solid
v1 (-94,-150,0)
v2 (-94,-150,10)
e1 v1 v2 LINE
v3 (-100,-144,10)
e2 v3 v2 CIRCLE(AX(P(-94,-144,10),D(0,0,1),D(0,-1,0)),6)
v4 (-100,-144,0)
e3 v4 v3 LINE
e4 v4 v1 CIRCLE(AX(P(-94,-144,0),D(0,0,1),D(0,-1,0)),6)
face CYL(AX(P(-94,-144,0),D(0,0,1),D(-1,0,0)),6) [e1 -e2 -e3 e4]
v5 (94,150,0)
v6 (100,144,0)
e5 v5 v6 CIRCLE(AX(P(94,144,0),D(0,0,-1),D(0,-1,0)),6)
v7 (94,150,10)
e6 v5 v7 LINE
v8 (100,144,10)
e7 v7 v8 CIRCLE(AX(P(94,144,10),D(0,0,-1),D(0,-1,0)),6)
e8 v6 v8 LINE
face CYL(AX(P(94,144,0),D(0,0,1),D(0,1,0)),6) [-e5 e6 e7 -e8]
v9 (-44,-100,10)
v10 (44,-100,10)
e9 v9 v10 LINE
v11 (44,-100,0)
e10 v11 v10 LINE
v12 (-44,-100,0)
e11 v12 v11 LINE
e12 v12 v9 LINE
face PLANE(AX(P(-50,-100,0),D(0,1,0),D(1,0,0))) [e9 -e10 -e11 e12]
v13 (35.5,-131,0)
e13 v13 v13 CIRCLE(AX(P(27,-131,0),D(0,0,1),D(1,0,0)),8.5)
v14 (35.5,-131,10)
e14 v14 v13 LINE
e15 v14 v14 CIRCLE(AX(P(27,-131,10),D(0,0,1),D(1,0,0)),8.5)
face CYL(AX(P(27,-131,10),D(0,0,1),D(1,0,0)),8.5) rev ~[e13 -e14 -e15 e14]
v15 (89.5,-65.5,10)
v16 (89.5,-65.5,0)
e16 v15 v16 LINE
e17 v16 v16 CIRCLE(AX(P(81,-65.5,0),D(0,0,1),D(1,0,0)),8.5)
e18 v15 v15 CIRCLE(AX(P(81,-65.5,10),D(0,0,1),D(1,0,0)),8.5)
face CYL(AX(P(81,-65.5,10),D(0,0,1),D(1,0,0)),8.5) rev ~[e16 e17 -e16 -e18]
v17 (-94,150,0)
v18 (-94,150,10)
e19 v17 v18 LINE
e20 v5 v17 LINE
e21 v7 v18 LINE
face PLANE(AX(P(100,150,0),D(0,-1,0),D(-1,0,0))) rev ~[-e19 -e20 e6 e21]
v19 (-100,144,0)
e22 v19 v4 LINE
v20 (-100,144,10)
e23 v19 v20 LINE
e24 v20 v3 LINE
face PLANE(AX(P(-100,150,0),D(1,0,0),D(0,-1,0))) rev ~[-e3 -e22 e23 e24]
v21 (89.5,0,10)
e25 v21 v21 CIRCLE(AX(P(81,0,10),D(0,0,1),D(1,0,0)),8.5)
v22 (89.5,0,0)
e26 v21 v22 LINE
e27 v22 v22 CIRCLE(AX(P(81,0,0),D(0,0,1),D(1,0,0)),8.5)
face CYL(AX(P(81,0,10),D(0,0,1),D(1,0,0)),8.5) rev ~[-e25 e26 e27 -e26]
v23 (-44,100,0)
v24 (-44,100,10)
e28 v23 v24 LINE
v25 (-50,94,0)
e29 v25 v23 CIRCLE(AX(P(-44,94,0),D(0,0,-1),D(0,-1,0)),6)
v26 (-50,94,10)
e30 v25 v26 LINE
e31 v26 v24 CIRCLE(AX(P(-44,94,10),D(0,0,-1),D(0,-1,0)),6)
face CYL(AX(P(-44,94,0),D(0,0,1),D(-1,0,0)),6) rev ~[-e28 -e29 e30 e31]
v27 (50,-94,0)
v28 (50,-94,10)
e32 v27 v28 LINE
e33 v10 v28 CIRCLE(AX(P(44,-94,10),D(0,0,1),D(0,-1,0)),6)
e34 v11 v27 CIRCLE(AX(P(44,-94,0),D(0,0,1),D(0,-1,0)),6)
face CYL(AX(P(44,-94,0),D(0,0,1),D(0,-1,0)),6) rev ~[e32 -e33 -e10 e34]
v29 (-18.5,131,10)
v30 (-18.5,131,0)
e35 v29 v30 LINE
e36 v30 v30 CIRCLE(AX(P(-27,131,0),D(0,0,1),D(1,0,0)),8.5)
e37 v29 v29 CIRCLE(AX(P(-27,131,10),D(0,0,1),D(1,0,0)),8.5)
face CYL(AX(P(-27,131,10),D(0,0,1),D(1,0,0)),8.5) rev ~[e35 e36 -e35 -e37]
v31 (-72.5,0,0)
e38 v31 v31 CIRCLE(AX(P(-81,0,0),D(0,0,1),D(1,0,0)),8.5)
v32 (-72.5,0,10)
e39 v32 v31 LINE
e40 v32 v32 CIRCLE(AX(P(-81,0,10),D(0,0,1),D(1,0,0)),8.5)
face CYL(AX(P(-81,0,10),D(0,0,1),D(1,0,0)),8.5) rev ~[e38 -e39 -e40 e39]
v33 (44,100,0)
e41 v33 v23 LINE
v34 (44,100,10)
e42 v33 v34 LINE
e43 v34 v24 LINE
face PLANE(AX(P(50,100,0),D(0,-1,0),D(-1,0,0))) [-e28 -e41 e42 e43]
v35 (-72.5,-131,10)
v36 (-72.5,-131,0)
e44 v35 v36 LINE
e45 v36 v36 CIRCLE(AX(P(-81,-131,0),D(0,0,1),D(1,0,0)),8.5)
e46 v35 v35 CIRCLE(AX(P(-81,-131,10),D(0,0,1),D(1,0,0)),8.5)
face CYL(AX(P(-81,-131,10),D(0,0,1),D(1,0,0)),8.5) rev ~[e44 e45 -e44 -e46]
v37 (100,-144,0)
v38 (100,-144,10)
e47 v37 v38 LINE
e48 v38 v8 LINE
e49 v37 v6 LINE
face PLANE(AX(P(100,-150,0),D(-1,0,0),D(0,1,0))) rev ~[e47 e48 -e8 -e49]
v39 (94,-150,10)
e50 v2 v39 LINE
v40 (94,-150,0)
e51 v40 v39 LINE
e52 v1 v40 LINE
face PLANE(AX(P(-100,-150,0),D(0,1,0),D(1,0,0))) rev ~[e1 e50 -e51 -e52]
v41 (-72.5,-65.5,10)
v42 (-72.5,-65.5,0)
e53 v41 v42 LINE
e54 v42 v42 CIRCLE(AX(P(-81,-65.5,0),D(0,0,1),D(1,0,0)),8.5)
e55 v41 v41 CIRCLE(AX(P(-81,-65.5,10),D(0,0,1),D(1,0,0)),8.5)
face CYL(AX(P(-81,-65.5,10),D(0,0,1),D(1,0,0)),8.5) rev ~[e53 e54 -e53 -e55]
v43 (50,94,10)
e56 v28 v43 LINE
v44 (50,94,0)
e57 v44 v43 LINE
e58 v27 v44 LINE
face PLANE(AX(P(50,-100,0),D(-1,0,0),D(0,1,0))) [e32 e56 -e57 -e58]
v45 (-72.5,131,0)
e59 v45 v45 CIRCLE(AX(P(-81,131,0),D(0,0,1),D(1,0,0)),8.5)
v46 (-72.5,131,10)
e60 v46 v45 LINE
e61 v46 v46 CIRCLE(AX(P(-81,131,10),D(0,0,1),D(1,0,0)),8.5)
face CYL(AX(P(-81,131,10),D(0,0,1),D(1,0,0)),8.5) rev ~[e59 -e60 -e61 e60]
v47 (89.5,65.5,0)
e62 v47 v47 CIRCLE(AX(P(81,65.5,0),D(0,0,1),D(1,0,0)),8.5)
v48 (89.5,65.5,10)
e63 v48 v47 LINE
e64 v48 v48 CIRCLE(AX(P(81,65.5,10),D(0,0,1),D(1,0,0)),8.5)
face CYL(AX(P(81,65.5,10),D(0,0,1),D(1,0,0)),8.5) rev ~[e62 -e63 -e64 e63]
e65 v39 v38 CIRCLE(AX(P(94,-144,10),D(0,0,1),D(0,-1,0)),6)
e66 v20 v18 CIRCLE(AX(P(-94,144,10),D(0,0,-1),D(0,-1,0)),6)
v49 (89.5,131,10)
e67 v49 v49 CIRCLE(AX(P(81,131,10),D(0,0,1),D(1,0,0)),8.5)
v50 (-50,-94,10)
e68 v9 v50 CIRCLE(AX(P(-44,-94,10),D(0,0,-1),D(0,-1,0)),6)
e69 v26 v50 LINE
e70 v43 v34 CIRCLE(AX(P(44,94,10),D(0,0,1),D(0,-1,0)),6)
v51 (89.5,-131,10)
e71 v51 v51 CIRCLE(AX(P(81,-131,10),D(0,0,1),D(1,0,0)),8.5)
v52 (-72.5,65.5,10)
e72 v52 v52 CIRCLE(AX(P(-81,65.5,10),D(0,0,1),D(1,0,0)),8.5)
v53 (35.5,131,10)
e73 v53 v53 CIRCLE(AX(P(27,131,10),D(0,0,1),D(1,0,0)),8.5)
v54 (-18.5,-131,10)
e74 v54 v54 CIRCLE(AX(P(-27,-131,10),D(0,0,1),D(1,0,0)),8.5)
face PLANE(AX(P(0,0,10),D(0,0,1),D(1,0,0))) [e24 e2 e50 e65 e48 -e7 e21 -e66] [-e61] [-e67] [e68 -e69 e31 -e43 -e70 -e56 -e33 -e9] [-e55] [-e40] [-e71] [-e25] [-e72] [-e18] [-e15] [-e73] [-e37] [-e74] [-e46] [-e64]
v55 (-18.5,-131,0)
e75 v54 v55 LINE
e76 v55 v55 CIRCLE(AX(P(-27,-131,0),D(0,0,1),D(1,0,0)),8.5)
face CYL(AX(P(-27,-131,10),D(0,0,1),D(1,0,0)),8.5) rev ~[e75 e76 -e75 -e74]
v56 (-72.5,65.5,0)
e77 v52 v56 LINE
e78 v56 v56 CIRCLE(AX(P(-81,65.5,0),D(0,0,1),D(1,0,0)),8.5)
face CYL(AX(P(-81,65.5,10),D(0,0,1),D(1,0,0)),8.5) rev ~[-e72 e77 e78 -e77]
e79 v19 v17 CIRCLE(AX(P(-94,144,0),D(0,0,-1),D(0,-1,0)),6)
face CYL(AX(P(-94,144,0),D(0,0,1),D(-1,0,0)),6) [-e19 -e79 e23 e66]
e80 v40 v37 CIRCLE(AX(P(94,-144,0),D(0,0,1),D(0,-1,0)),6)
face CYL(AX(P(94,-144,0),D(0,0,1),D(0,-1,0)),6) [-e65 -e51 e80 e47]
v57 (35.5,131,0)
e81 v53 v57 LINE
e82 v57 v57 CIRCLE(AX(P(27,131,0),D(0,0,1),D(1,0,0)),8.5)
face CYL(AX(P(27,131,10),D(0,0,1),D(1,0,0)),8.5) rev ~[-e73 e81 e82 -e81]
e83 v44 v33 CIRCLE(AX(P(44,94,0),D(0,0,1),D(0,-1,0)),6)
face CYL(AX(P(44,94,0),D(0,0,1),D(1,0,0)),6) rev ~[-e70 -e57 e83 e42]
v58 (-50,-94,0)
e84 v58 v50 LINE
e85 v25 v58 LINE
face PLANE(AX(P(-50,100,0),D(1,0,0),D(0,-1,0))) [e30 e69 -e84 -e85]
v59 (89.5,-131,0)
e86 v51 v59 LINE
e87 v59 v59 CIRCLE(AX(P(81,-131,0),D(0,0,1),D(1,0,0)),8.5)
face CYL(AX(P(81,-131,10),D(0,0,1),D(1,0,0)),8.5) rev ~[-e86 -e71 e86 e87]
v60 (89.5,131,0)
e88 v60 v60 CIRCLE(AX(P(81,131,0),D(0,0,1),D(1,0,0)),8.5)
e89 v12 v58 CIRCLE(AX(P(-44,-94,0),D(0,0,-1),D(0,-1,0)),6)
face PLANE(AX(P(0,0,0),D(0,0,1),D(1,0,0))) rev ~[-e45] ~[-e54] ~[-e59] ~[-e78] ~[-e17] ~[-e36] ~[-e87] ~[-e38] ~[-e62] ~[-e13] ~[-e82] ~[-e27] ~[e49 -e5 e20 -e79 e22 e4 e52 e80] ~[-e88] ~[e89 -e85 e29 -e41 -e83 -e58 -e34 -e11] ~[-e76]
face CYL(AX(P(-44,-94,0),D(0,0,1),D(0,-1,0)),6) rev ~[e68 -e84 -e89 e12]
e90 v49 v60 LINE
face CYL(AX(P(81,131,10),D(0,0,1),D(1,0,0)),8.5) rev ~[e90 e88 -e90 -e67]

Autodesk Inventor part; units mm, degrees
ref_plane "YZ Plane" through (0, 0, 0) normal (1, 0, 0) x (0, 1, 0)
ref_plane "XZ Plane" through (0, 0, 0) normal (0, 1, 0) x (-1, 0, 0)
ref_plane "XY Plane" through (0, 0, 0) normal (0, 0, 1) x (1, 0, 0)
sketch "Sketch2" plane through (0, 0, 0) normal (0, 0, 1) x (1, 0, 0)
  line L0 (-50, -100) -> (50, -100)
  line L1 (50, -100) -> (50, 100)
  line L2 (50, 100) -> (-50, 100)
  line L3 (-50, 100) -> (-50, -100)
  line L4 (-50, -100) -> (50, 100) construction
  line L5 (50, -100) -> (-50, 100) construction
  line L6 (-100, -150) -> (100, -150)
  line L7 (100, -150) -> (100, 150)
  line L8 (100, 150) -> (-100, 150)
  line L9 (-100, 150) -> (-100, -150)
  point P0 (0, 0)
  dimension "d29" = 100
  dimension "d30" = 200
  dimension "d31" = 50
extrude "Plate2" add sketch "Sketch2" along normal blind 10
sketch "Sketch5" plane through (0, 0, 10) normal (0, 0, 1) x (1, 0, 0)
  line L0 (50, 100) -> (50, -100) construction
  line L1 (50, -100) -> (-50, -100) construction
  line L2 (-50, -100) -> (-50, 100) construction
  line L3 (-50, 100) -> (50, 100) construction
  line L4 (100, -150) -> (-100, -150) construction
  line L5 (100, 150) -> (100, -150) construction
  line L6 (-100, 150) -> (100, 150) construction
  line L7 (-100, -150) -> (-100, 150) construction
  line L8 (-81, 131) -> (81, 131) construction
  line L9 (81, 131) -> (81, -131) construction
  line L10 (81, -131) -> (-81, -131) construction
  line L11 (-81, -131) -> (-81, 131) construction
  circle A0 centre (-81, -131) radius 8.5
  circle A1 centre (-81, 131) radius 8.5
  circle A2 centre (-81, 0) radius 8.5
  circle A3 centre (-81, -65.5) radius 8.5
  circle A4 centre (-81, 65.5) radius 8.5
  line L12 (-50, 0) -> (50, 0) construction
  circle A5 centre (-27, -131) radius 8.5
  circle A6 centre (-27, -65.5) radius 8.5
  circle A7 centre (-27, 0) radius 8.5
  circle A8 centre (-27, 65.5) radius 8.5
  circle A9 centre (-27, 131) radius 8.5
  circle A10 centre (27, -131) radius 8.5
  circle A11 centre (27, -65.5) radius 8.5
  circle A12 centre (27, 0) radius 8.5
  circle A13 centre (27, 65.5) radius 8.5
  circle A14 centre (27, 131) radius 8.5
  circle A15 centre (81, -131) radius 8.5
  circle A16 centre (81, -65.5) radius 8.5
  circle A17 centre (81, 0) radius 8.5
  circle A18 centre (81, 65.5) radius 8.5
  circle A19 centre (81, 131) radius 8.5
  point P0 (0, 0)
  point P1 (0, -131)
  dimension "d33" = 17
  dimension "d34" = 19
  dimension "d35" = 65.5
  dimension "d36" = 65.5
  dimension "d39" = 54
extrude "Cut3" cut sketch "Sketch5" against normal blind 10
fillet "Corner Round1" radius 6 8 edges at (-100, -150, 5) (-100, 150, 5) (100, 150, 5) (100, -150, 5) (50, -100, 5) (-50, -100, 5) (-50, 100, 5) (50, 100, 5)
equation "\"d35\" = d36"
equation "\"d44\" = Thickness"
equation "\"d14\" = Thickness"
equation "\"BendReliefDepth\" = 0.5 * Thickness"
equation "\"TransitionRadius\" = BendRadius"
equation "\"JacobiRadiusSize\" = BendRadius"
equation "\"Thickness\" = 10"
equation "\"BendRadius\" = 6"
properties part number "PRS 1706 charging flange round_940" material "Steel"
